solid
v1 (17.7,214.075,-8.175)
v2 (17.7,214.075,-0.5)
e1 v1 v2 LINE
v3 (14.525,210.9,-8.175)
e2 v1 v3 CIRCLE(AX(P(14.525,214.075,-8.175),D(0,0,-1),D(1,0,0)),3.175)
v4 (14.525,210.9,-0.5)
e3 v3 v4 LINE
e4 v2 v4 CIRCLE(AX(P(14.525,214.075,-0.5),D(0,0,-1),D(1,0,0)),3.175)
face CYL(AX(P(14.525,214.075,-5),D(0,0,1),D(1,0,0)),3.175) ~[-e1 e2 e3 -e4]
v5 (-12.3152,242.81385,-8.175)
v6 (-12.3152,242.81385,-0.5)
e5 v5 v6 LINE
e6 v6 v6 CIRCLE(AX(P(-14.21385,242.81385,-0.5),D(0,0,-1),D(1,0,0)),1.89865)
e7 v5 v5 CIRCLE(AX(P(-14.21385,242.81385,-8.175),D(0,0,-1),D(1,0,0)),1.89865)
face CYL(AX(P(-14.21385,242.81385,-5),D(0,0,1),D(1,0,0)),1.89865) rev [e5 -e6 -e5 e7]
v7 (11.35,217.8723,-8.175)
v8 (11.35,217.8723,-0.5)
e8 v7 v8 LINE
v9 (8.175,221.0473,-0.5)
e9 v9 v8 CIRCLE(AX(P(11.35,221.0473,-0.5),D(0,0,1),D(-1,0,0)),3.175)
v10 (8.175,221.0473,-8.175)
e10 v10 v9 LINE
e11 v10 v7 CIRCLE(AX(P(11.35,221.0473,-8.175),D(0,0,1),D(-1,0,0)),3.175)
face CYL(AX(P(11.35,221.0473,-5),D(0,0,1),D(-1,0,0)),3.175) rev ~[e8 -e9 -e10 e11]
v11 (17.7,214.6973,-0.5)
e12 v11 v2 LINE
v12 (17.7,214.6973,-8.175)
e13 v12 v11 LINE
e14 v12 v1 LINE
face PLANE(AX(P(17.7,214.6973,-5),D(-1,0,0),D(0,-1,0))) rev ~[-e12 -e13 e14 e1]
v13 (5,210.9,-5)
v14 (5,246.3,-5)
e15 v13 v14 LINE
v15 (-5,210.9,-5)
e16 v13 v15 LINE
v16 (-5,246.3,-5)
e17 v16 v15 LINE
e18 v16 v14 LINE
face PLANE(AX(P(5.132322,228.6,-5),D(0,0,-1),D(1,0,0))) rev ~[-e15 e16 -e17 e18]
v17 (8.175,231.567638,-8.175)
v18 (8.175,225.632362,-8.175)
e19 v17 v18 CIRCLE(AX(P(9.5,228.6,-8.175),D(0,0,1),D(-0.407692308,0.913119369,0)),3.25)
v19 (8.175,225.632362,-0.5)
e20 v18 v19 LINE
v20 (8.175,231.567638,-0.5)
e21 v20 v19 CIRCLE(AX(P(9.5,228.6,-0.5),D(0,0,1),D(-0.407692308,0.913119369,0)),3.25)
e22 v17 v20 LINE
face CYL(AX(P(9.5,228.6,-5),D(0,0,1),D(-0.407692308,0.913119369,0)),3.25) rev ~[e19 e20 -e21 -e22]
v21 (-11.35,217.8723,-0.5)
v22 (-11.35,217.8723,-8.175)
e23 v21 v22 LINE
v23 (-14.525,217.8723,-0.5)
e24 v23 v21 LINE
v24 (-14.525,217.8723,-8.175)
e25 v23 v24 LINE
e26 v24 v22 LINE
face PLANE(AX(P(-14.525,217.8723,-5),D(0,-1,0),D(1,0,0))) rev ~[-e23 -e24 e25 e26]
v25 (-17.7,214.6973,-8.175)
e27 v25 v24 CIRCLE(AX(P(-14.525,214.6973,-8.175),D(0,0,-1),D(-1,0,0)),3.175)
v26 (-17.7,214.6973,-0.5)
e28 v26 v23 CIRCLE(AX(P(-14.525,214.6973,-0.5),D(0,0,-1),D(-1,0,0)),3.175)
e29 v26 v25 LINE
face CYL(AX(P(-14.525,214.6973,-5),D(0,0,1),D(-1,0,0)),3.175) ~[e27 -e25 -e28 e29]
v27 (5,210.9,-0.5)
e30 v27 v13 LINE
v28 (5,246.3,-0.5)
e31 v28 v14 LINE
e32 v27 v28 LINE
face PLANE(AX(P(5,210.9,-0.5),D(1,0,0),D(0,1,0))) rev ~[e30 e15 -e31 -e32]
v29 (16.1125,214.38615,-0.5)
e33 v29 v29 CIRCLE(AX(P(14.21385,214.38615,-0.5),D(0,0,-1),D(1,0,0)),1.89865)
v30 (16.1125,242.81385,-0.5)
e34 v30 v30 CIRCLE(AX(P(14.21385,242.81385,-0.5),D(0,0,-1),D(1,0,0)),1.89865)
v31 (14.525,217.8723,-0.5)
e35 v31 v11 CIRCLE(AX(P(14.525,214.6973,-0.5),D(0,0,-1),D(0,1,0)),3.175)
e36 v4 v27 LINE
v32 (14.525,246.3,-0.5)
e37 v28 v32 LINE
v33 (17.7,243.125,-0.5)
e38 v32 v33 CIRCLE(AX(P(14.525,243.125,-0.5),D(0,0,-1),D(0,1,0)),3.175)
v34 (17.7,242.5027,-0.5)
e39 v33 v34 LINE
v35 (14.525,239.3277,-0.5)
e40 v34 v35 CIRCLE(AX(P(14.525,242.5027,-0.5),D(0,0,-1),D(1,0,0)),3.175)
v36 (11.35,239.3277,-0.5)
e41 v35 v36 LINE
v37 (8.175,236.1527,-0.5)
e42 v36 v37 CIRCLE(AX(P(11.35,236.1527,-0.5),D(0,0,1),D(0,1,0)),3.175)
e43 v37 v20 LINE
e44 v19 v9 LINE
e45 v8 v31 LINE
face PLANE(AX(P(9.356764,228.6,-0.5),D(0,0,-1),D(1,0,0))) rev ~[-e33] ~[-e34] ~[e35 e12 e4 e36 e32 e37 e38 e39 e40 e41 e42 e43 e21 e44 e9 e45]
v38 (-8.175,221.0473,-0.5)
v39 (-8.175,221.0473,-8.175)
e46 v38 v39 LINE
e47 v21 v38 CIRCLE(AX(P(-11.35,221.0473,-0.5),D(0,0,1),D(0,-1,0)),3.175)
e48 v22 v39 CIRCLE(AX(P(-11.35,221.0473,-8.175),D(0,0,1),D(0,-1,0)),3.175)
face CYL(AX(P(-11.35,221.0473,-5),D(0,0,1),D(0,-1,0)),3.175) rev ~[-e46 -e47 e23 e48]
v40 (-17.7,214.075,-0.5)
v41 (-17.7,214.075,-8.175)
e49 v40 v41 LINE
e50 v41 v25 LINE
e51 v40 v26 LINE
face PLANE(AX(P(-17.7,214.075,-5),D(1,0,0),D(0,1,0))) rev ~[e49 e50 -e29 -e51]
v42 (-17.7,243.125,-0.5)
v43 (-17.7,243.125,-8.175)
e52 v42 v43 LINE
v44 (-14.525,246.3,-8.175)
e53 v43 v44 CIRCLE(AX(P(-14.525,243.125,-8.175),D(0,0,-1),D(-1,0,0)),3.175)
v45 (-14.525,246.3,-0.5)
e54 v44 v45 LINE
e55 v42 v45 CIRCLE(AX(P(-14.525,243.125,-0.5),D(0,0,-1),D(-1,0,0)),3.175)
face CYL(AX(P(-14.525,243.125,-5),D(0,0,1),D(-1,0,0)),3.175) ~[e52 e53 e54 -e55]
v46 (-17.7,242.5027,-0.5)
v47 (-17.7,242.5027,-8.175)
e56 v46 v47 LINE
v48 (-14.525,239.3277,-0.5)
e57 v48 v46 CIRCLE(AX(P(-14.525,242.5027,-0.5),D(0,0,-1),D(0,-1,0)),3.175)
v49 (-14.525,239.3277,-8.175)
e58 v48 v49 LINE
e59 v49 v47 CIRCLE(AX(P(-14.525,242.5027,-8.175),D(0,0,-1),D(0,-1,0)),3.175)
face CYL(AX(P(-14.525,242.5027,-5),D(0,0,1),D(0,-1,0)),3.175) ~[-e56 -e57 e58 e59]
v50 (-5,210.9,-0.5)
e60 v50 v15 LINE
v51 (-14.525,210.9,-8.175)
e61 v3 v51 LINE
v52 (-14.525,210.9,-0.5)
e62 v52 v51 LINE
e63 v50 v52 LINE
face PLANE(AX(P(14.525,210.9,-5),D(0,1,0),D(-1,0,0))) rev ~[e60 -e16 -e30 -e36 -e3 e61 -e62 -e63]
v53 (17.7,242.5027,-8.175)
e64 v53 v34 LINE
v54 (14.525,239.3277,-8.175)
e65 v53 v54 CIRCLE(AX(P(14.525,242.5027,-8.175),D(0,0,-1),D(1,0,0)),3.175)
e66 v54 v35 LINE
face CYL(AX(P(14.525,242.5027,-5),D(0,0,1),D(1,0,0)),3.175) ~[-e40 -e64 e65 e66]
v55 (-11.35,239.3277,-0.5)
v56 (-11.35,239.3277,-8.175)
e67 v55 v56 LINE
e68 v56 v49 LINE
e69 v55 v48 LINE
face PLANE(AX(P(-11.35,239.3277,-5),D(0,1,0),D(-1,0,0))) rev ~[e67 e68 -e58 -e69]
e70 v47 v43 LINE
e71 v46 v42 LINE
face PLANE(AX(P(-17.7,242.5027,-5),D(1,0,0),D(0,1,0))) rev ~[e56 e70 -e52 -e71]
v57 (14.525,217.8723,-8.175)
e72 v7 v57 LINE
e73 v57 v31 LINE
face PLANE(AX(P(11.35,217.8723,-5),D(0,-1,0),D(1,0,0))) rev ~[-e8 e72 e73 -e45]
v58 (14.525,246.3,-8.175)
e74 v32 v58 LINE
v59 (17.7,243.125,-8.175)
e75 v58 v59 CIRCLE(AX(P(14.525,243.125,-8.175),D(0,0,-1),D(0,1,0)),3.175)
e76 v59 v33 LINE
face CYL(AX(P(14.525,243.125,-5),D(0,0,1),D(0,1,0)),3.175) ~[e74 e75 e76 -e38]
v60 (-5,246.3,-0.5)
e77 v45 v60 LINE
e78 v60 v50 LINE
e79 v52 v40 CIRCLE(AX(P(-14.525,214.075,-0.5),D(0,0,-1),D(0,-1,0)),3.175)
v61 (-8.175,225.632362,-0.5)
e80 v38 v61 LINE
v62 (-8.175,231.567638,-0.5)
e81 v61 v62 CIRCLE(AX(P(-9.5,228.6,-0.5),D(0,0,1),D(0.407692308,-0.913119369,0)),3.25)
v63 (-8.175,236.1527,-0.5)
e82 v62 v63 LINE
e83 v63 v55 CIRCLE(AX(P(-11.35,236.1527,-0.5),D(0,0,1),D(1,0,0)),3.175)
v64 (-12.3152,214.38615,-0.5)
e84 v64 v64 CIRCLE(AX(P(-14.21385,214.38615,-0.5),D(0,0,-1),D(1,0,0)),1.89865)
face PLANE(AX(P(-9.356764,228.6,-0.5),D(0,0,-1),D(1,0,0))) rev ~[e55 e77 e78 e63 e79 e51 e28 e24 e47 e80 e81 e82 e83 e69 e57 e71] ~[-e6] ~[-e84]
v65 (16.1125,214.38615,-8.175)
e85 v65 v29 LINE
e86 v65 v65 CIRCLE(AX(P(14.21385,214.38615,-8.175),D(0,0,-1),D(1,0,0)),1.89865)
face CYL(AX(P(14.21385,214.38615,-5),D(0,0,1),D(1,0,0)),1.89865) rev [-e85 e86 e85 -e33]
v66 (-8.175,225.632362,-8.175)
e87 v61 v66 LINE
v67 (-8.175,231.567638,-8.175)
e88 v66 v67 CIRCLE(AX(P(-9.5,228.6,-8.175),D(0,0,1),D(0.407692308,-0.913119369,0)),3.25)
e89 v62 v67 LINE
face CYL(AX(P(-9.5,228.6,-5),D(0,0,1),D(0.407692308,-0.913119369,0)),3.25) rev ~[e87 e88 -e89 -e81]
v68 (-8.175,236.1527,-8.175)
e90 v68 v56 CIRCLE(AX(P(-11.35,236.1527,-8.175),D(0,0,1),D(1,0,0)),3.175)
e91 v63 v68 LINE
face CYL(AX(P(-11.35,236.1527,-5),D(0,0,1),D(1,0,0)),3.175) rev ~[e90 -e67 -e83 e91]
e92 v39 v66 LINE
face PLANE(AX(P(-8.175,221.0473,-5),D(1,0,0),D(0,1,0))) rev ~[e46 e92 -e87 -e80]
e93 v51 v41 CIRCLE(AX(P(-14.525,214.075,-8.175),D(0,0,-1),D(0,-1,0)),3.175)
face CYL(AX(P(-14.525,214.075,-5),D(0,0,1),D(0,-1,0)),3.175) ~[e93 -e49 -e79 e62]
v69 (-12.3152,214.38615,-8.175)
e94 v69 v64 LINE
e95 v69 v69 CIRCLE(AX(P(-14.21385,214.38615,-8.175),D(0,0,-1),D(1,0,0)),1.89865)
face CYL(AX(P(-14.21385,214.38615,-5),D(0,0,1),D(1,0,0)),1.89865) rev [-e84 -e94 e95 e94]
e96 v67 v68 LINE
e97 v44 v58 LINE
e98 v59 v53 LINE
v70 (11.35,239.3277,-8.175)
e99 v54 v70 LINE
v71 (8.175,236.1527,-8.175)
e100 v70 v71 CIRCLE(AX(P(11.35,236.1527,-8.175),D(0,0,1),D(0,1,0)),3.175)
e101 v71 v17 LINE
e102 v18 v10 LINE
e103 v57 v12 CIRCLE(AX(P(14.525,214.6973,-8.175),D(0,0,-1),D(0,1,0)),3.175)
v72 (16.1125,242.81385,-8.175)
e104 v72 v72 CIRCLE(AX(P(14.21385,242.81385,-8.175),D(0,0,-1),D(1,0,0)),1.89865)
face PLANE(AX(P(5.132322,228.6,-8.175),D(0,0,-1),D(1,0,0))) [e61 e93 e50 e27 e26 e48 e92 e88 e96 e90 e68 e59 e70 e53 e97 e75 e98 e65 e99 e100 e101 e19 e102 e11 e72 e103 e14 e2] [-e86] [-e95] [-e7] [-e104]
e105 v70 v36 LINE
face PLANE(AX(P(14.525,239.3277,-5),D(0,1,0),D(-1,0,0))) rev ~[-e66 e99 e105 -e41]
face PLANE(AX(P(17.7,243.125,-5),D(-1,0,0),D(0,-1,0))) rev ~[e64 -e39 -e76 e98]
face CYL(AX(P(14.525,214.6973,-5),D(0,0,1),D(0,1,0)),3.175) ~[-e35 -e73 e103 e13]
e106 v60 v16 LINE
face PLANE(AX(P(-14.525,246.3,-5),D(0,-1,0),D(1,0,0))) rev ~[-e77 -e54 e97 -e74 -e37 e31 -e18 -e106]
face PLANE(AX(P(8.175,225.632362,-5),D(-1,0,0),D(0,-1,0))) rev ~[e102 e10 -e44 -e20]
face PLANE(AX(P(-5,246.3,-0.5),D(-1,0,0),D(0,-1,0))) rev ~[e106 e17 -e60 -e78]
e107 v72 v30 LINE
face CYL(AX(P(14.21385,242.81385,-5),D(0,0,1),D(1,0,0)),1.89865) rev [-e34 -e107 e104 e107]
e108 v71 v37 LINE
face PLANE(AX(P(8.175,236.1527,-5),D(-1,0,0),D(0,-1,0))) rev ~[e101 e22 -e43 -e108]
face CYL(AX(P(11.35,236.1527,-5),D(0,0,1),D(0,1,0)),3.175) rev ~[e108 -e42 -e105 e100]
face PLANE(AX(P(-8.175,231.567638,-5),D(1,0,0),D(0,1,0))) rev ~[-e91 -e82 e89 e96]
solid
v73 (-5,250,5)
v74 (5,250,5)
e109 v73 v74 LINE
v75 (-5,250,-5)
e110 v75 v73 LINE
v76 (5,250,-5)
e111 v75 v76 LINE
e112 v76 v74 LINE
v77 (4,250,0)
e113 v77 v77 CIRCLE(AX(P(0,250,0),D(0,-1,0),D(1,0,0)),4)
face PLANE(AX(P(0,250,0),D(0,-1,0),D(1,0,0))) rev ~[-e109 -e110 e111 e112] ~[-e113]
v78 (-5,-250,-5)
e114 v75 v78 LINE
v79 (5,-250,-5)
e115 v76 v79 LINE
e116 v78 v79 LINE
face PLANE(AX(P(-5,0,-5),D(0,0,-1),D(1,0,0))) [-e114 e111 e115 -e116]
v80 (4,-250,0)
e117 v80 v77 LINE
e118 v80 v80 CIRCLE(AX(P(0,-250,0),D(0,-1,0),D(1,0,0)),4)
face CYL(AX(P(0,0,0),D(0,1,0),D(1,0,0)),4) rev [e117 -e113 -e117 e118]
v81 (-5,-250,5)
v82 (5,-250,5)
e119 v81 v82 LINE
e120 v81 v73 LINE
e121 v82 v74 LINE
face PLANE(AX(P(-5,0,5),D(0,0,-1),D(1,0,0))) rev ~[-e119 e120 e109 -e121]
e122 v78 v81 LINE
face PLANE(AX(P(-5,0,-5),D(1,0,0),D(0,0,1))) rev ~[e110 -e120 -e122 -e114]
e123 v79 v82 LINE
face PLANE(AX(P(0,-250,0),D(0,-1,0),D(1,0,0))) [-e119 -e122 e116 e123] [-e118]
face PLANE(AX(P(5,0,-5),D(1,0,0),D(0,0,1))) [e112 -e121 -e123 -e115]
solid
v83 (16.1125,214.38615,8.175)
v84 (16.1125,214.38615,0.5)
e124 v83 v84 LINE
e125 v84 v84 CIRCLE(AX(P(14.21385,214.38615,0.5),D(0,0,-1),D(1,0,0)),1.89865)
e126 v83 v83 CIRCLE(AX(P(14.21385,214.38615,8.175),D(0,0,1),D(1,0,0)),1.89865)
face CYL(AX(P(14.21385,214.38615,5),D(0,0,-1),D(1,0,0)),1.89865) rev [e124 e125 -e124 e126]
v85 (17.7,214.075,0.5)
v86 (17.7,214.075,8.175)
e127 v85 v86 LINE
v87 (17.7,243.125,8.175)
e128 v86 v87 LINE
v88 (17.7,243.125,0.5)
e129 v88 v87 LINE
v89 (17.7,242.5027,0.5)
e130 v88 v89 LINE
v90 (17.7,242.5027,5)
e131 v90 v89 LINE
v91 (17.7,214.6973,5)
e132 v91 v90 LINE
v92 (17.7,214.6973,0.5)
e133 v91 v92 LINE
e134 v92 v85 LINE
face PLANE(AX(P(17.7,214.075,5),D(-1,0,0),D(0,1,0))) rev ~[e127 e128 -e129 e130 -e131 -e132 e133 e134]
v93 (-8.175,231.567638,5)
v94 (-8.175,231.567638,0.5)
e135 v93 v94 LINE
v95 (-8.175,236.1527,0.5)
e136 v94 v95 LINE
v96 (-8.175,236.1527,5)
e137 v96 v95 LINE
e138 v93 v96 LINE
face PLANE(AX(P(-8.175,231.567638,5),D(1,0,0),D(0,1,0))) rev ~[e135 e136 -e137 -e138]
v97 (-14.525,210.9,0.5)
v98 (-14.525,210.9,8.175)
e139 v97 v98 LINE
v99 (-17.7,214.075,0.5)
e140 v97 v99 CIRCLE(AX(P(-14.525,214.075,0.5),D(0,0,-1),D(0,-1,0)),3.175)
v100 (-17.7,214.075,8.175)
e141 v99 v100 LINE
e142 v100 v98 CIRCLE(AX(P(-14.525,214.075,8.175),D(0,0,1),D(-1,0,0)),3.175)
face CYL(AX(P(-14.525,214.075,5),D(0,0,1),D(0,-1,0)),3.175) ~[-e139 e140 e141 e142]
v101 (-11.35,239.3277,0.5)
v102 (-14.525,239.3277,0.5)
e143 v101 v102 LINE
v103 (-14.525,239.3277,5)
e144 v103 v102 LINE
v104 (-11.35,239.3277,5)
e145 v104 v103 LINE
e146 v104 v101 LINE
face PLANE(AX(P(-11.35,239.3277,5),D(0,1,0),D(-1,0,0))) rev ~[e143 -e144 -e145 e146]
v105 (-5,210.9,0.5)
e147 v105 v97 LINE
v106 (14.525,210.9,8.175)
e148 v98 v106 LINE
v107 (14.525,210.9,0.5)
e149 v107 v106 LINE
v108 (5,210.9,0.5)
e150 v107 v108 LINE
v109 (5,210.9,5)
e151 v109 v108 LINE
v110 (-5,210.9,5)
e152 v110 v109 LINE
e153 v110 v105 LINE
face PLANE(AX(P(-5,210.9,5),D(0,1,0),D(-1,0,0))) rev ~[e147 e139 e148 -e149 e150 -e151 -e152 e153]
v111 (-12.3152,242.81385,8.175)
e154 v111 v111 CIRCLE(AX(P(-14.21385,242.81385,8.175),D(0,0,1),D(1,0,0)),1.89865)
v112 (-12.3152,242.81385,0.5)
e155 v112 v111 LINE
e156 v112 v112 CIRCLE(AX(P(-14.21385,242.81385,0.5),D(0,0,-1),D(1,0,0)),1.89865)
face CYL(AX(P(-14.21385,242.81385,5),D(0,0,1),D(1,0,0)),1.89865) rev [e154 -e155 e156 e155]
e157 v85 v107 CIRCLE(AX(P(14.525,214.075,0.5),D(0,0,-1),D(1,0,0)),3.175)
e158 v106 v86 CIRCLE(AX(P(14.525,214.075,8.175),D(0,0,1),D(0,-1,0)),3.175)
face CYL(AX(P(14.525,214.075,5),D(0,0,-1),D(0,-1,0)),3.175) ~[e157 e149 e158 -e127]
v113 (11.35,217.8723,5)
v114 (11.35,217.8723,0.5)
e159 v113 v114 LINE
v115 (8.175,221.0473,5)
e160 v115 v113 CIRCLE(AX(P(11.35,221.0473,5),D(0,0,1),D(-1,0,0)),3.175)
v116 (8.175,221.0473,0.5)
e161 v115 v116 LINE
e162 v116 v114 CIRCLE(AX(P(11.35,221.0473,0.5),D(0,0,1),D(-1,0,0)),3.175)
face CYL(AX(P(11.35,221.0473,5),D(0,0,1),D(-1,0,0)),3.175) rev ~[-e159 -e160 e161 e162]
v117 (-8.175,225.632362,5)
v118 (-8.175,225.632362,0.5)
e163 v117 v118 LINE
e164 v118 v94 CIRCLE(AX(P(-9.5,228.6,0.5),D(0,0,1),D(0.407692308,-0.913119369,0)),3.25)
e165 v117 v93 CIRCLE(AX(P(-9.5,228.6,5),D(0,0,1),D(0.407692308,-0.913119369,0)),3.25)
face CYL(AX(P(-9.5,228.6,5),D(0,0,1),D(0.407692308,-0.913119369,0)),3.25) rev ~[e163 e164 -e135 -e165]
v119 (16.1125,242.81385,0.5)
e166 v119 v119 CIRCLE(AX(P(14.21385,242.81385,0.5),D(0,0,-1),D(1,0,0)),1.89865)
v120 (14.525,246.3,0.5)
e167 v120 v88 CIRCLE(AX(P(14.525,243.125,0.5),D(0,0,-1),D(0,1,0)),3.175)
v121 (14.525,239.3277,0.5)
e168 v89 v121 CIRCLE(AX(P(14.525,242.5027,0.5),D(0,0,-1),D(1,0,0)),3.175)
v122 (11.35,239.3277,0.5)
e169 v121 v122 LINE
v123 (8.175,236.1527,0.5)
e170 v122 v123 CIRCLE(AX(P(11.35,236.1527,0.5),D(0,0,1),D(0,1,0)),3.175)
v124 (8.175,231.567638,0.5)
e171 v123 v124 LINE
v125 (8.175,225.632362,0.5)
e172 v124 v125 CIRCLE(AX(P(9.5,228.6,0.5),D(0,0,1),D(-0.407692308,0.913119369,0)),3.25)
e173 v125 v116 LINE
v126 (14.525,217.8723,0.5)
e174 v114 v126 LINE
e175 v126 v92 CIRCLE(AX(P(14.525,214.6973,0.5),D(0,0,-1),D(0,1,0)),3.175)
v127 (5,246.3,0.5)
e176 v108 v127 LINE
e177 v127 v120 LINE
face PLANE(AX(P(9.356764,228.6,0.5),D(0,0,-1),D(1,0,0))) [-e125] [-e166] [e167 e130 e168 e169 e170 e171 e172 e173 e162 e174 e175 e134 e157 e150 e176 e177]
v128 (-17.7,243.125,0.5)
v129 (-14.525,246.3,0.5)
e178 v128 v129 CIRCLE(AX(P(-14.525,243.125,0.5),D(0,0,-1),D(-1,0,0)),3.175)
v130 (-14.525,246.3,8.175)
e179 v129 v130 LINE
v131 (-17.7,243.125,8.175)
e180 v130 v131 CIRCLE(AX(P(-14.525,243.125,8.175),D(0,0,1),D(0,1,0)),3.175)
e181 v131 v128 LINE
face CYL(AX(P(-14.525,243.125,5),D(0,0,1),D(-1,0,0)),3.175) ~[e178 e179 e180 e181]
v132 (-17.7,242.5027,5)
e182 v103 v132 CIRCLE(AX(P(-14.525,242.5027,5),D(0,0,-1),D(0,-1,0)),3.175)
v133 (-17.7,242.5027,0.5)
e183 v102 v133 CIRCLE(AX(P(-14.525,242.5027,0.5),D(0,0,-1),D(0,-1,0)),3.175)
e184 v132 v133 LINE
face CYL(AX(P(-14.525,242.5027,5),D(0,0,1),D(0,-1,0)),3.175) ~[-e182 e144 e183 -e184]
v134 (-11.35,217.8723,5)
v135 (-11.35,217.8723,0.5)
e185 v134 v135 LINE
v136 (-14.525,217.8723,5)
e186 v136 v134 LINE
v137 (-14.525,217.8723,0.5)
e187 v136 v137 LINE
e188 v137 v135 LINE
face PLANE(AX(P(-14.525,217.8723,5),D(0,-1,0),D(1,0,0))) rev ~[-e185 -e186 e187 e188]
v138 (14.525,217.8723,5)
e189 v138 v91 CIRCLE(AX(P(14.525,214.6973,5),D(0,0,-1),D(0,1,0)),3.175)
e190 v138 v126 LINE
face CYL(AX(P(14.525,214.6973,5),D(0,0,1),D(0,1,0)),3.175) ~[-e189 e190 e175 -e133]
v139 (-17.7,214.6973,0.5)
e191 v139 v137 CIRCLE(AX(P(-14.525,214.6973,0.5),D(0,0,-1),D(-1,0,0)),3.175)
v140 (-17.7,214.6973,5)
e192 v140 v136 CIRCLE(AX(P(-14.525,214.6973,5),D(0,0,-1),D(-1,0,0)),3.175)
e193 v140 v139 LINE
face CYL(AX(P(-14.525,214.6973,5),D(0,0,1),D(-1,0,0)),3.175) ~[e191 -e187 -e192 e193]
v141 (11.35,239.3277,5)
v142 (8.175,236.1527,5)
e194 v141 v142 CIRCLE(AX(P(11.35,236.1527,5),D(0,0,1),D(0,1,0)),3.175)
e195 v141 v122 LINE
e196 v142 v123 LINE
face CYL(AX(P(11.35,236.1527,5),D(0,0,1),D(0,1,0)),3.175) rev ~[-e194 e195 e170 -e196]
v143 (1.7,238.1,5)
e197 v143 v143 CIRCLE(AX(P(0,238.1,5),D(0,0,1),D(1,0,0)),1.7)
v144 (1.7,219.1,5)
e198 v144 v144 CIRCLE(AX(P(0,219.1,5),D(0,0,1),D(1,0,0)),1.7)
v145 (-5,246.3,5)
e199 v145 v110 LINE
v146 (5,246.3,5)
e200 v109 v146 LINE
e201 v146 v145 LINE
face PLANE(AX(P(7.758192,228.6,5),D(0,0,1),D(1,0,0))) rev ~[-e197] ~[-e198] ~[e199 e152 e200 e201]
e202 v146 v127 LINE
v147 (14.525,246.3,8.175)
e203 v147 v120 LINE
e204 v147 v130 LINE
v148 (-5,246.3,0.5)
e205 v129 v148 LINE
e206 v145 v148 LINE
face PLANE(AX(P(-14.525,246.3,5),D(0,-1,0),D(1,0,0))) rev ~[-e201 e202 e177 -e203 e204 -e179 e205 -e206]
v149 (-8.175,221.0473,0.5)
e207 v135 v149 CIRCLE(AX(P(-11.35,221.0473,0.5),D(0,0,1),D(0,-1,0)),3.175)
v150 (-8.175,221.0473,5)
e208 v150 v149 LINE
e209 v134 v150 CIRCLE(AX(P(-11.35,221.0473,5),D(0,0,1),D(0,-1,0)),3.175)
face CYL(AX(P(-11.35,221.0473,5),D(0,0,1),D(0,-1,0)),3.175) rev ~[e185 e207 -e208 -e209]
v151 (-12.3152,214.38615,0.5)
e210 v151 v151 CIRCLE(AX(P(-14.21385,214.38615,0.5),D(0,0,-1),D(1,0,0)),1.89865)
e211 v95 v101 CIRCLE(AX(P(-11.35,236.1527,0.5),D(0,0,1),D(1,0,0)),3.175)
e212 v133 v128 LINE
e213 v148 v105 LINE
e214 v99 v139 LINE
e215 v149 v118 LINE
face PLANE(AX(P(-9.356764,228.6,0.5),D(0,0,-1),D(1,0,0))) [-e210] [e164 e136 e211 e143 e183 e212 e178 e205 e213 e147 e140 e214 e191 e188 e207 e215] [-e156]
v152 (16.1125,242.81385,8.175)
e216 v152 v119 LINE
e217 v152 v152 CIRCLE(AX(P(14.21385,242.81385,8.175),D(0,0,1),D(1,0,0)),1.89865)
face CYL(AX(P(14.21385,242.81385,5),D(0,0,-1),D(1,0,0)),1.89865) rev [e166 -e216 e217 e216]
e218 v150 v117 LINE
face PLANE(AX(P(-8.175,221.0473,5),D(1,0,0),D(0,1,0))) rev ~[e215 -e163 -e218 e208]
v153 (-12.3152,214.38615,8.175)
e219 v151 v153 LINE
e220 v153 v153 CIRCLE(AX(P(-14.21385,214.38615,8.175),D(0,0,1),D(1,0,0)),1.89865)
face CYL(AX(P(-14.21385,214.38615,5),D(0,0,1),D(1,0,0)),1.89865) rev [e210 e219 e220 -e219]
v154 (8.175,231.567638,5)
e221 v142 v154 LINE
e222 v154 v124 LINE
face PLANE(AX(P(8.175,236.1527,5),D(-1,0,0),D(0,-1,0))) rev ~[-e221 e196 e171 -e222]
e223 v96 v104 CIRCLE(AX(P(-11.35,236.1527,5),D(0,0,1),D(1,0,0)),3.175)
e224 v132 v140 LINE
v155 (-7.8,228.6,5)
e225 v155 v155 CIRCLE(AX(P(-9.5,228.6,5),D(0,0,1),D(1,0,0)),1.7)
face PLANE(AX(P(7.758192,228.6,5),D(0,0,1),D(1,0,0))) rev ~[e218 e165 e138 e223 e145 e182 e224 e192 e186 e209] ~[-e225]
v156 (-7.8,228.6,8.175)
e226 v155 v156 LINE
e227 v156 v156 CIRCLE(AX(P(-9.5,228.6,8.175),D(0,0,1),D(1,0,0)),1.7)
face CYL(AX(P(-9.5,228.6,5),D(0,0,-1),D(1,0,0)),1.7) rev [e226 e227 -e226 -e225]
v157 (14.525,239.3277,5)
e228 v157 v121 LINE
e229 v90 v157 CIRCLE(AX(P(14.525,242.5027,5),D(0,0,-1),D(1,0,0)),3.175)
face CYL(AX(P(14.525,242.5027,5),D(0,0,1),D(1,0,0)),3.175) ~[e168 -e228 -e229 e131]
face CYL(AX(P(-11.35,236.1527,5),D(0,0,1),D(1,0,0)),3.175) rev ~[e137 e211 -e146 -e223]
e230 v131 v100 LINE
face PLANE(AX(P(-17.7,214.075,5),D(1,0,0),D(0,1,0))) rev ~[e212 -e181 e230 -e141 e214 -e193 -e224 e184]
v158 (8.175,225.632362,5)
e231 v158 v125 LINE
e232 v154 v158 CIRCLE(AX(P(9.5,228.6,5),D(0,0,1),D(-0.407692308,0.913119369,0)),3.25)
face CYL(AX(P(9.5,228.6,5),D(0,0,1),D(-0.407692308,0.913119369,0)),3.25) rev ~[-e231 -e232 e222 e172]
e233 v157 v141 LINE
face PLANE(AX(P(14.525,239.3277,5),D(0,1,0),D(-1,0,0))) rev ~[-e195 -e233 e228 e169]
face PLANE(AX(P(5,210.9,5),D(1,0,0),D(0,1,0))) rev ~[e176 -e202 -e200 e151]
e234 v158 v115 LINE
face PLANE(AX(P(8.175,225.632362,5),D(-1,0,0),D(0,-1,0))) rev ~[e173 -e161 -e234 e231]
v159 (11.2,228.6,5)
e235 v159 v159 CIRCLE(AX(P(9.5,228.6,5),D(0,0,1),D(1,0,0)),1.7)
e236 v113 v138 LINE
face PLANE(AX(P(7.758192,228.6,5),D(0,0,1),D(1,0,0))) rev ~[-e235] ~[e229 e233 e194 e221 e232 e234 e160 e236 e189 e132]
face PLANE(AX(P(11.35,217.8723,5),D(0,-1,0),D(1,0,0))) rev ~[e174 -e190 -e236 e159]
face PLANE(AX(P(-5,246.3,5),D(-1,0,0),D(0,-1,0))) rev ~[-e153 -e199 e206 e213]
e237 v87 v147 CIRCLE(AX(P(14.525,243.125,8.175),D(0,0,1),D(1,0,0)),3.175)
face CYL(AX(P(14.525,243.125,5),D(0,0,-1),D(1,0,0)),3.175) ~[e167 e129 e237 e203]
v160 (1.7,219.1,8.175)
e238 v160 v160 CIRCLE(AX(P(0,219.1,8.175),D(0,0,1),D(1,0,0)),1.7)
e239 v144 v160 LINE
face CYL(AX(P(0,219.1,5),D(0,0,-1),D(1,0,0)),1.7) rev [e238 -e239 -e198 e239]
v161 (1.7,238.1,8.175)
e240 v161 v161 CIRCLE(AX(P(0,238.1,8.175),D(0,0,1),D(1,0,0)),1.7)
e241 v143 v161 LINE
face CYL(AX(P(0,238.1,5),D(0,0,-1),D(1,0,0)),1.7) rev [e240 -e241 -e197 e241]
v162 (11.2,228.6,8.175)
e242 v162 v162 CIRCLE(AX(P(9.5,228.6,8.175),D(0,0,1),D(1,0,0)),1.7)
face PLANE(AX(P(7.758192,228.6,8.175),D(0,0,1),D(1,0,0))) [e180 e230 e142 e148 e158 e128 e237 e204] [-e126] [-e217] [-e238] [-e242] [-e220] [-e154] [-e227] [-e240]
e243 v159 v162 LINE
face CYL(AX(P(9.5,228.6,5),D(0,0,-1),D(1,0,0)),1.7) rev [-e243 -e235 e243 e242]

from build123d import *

# Parameters (mm, degrees)
F0_W      = 10
F0_H      = 10
F0_R      = 4
F1_DEPTH  = 250
F2_R      = 1.7
F2_R_2    = 1.89865
F3_DEPTH  = 3.175
F4_R      = 1.89865
F5_DEPTH  = 4.5
F7_R      = 1.89865
F8_DEPTH  = 4.5
F9_R      = 1.89865
F10_DEPTH = 3.175


with BuildPart() as f1:
    # F0 (on Front) → F1 (new body, symmetric)
    with BuildSketch(Plane.XZ):
        Rectangle(F0_W, F0_H)
        Circle(F0_R, mode=Mode.SUBTRACT)
    extrude(amount=F1_DEPTH, both=True)


with BuildPart() as f3:
    # F2 (on face) → F3 (new body)
    with BuildSketch(Plane.XY.offset(5)):
        with BuildLine():
            ThreePointArc((5, 216.060063796), (11.1747483193, 221.0253712962), (13.5, 228.6))
            ThreePointArc((13.5, 228.6), (11.1747483193, 236.1746287038), (5, 241.139936204))
            Line((5, 241.139936204), (5, 216.060063796))
        make_face()
        with Locations((9.5, 228.6)):
            Circle(F2_R, mode=Mode.SUBTRACT)
        with BuildLine():
            ThreePointArc((5, 241.139936204), (11.1747483193, 236.1746287038), (13.5, 228.6))
            ThreePointArc((13.5, 228.6), (11.1747483193, 221.0253712962), (5, 216.060063796))
            Line((5, 216.060063796), (5, 212.6922778186))
            ThreePointArc((5, 212.6922778186), (13.4430395558, 218.7338805754), (16.675, 228.6))
            ThreePointArc((16.675, 228.6), (13.4430395558, 238.4661194246), (5, 244.5077221814))
            Line((5, 244.5077221814), (5, 241.139936204))
        make_face()
        with BuildLine():
            Line((5, 216.060063796), (5, 241.139936204))
            ThreePointArc((5, 241.139936204), (0, 242.1), (-5, 241.139936204))
            Line((-5, 241.139936204), (-5, 216.060063796))
            ThreePointArc((-5, 216.060063796), (0, 215.1), (5, 216.060063796))
        make_face()
        with Locations((0, 219.1)):
            Circle(F2_R, mode=Mode.SUBTRACT)
        with Locations((0, 238.1)):
            Circle(F2_R, mode=Mode.SUBTRACT)
        with BuildLine():
            ThreePointArc((-5, 241.139936204), (0, 242.1), (5, 241.139936204))
            Line((5, 241.139936204), (5, 244.5077221814))
            ThreePointArc((5, 244.5077221814), (0, 245.275), (-5, 244.5077221814))
            Line((-5, 244.5077221814), (-5, 241.139936204))
        make_face()
        with BuildLine():
            Line((5, 212.6922778186), (5, 216.060063796))
            ThreePointArc((5, 216.060063796), (0, 215.1), (-5, 216.060063796))
            Line((-5, 216.060063796), (-5, 212.6922778186))
            ThreePointArc((-5, 212.6922778186), (0, 211.925), (5, 212.6922778186))
        make_face()
        with BuildLine():
            Line((-5, 216.060063796), (-5, 241.139936204))
            ThreePointArc((-5, 241.139936204), (-13.5, 228.6), (-5, 216.060063796))
        make_face()
        with Locations((-9.5, 228.6)):
            Circle(F2_R, mode=Mode.SUBTRACT)
        with BuildLine():
            ThreePointArc((-5, 216.060063796), (-13.5, 228.6), (-5, 241.139936204))
            Line((-5, 241.139936204), (-5, 244.5077221814))
            ThreePointArc((-5, 244.5077221814), (-16.675, 228.6), (-5, 212.6922778186))
            Line((-5, 212.6922778186), (-5, 216.060063796))
        make_face()
        with BuildLine():
            Line((5, 246.3), (5, 244.5077221814))
            ThreePointArc((5, 244.5077221814), (13.4430395558, 238.4661194246), (16.675, 228.6))
            ThreePointArc((16.675, 228.6), (13.4430395558, 218.7338805754), (5, 212.6922778186))
            Line((5, 212.6922778186), (5, 210.9))
            Line((5, 210.9), (14.525, 210.9))
            ThreePointArc((14.525, 210.9), (16.7700640303, 211.8299359697), (17.7, 214.075))
            Line((17.7, 214.075), (17.7, 243.125))
            ThreePointArc((17.7, 243.125), (16.7700640303, 245.3700640303), (14.525, 246.3))
            Line((14.525, 246.3), (5, 246.3))
        make_face()
        with Locations((14.21385, 214.38615)):
            Circle(F2_R_2, mode=Mode.SUBTRACT)
        with Locations((14.21385, 242.81385)):
            Circle(F2_R_2, mode=Mode.SUBTRACT)
        with BuildLine():
            ThreePointArc((-5, 244.5077221814), (0, 245.275), (5, 244.5077221814))
            Line((5, 244.5077221814), (5, 246.3))
            Line((5, 246.3), (-5, 246.3))
            Line((-5, 246.3), (-5, 244.5077221814))
        make_face()
        with BuildLine():
            Line((5, 210.9), (5, 212.6922778186))
            ThreePointArc((5, 212.6922778186), (0, 211.925), (-5, 212.6922778186))
            Line((-5, 212.6922778186), (-5, 210.9))
            Line((-5, 210.9), (5, 210.9))
        make_face()
        with BuildLine():
            ThreePointArc((-5, 212.6922778186), (-16.675, 228.6), (-5, 244.5077221814))
            Line((-5, 244.5077221814), (-5, 246.3))
            Line((-5, 246.3), (-14.525, 246.3))
            ThreePointArc((-14.525, 246.3), (-16.7700640303, 245.3700640303), (-17.7, 243.125))
            Line((-17.7, 243.125), (-17.7, 214.075))
            ThreePointArc((-17.7, 214.075), (-16.7700640303, 211.8299359697), (-14.525, 210.9))
            Line((-14.525, 210.9), (-5, 210.9))
            Line((-5, 210.9), (-5, 212.6922778186))
        make_face()
        with Locations((-14.21385, 214.38615)):
            Circle(F2_R_2, mode=Mode.SUBTRACT)
        with Locations((-14.21385, 242.81385)):
            Circle(F2_R_2, mode=Mode.SUBTRACT)
    extrude(amount=F3_DEPTH)

    # F4 (on face) → F5 (join)
    with BuildSketch(Plane(origin=(0, 0, 5), x_dir=(1, 0, 0), z_dir=(0, 0, -1))):
        with BuildLine():
            ThreePointArc((-17.7, -214.6973), (-16.7700640303, -216.9423640303), (-14.525, -217.8723))
            Line((-14.525, -217.8723), (-11.35, -217.8723))
            ThreePointArc((-11.35, -217.8723), (-9.1049359697, -218.8022359697), (-8.175, -221.0473))
            Line((-8.175, -221.0473), (-8.175, -225.6323620504))
            ThreePointArc((-8.175, -225.6323620504), (-6.25, -228.6), (-8.175, -231.5676379496))
            Line((-8.175, -231.5676379496), (-8.175, -236.1527))
            ThreePointArc((-8.175, -236.1527), (-9.1049359697, -238.3977640303), (-11.35, -239.3277))
            Line((-11.35, -239.3277), (-14.525, -239.3277))
            ThreePointArc((-14.525, -239.3277), (-16.7700640303, -240.2576359697), (-17.7, -242.5027))
            Line((-17.7, -242.5027), (-17.7, -243.125))
            ThreePointArc((-17.7, -243.125), (-16.7700640303, -245.3700640303), (-14.525, -246.3))
            Line((-14.525, -246.3), (-5, -246.3))
            Line((-5, -246.3), (-5, -210.9))
            Line((-5, -210.9), (-14.525, -210.9))
            ThreePointArc((-14.525, -210.9), (-16.7700640303, -211.8299359697), (-17.7, -214.075))
            Line((-17.7, -214.075), (-17.7, -214.6973))
        make_face()
        with Locations((-14.21385, -242.81385)):
            Circle(F4_R, mode=Mode.SUBTRACT)
        with Locations((-14.21385, -214.38615)):
            Circle(F4_R, mode=Mode.SUBTRACT)
        with BuildLine():
            Line((14.525, -210.9), (5, -210.9))
            Line((5, -210.9), (5, -246.3))
            Line((5, -246.3), (14.525, -246.3))
            ThreePointArc((14.525, -246.3), (16.7700640303, -245.3700640303), (17.7, -243.125))
            Line((17.7, -243.125), (17.7, -242.5027))
            ThreePointArc((17.7, -242.5027), (16.7700640303, -240.2576359697), (14.525, -239.3277))
            Line((14.525, -239.3277), (11.35, -239.3277))
            ThreePointArc((11.35, -239.3277), (9.1049359697, -238.3977640303), (8.175, -236.1527))
            Line((8.175, -236.1527), (8.175, -231.5676379496))
            ThreePointArc((8.175, -231.5676379496), (6.25, -228.6), (8.175, -225.6323620504))
            Line((8.175, -225.6323620504), (8.175, -221.0473))
            ThreePointArc((8.175, -221.0473), (9.1049359697, -218.8022359697), (11.35, -217.8723))
            Line((11.35, -217.8723), (14.525, -217.8723))
            ThreePointArc((14.525, -217.8723), (16.7700640303, -216.9423640303), (17.7, -214.6973))
            Line((17.7, -214.6973), (17.7, -214.075))
            ThreePointArc((17.7, -214.075), (16.7700640303, -211.8299359697), (14.525, -210.9))
        make_face()
        with Locations((14.21385, -242.81385)):
            Circle(F4_R, mode=Mode.SUBTRACT)
        with Locations((14.21385, -214.38615)):
            Circle(F4_R, mode=Mode.SUBTRACT)
    extrude(amount=F5_DEPTH)


with BuildPart() as f8:
    # F7 (on offset) → F8 (new body)
    with BuildSketch(Plane(origin=(0, 0, -0.5), x_dir=(1, 0, 0), z_dir=(0, 0, -1))):
        with BuildLine():
            Line((-5, -210.9), (-14.525, -210.9))
            ThreePointArc((-14.525, -210.9), (-16.7700640303, -211.8299359697), (-17.7, -214.075))
            Line((-17.7, -214.075), (-17.7, -214.6973))
            ThreePointArc((-17.7, -214.6973), (-16.7700640303, -216.9423640303), (-14.525, -217.8723))
            Line((-14.525, -217.8723), (-11.35, -217.8723))
            ThreePointArc((-11.35, -217.8723), (-9.1049359697, -218.8022359697), (-8.175, -221.0473))
            Line((-8.175, -221.0473), (-8.175, -225.6323620504))
            ThreePointArc((-8.175, -225.6323620504), (-6.25, -228.6), (-8.175, -231.5676379496))
            Line((-8.175, -231.5676379496), (-8.175, -236.1527))
            ThreePointArc((-8.175, -236.1527), (-9.1049359697, -238.3977640303), (-11.35, -239.3277))
            Line((-11.35, -239.3277), (-14.525, -239.3277))
            ThreePointArc((-14.525, -239.3277), (-16.7700640303, -240.2576359697), (-17.7, -242.5027))
            Line((-17.7, -242.5027), (-17.7, -243.125))
            ThreePointArc((-17.7, -243.125), (-16.7700640303, -245.3700640303), (-14.525, -246.3))
            Line((-14.525, -246.3), (-5, -246.3))
            Line((-5, -246.3), (-5, -210.9))
        make_face()
        with Locations((-14.21385, -242.81385)):
            Circle(F7_R, mode=Mode.SUBTRACT)
        with Locations((-14.21385, -214.38615)):
            Circle(F7_R, mode=Mode.SUBTRACT)
    extrude(amount=F8_DEPTH)



with BuildPart() as f8b:
    # F7 (on offset) → F8, piece 2 (new body)
    with BuildSketch(Plane(origin=(0, 0, -0.5), x_dir=(1, 0, 0), z_dir=(0, 0, -1))):
        with BuildLine():
            Line((5, -210.9), (5, -246.3))
            Line((5, -246.3), (14.525, -246.3))
            ThreePointArc((14.525, -246.3), (16.7700640303, -245.3700640303), (17.7, -243.125))
            Line((17.7, -243.125), (17.7, -242.5027))
            ThreePointArc((17.7, -242.5027), (16.7700640303, -240.2576359697), (14.525, -239.3277))
            Line((14.525, -239.3277), (11.35, -239.3277))
            ThreePointArc((11.35, -239.3277), (9.1049359697, -238.3977640303), (8.175, -236.1527))
            Line((8.175, -236.1527), (8.175, -231.5676379496))
            ThreePointArc((8.175, -231.5676379496), (6.25, -228.6), (8.175, -225.6323620504))
            Line((8.175, -225.6323620504), (8.175, -221.0473))
            ThreePointArc((8.175, -221.0473), (9.1049359697, -218.8022359697), (11.35, -217.8723))
            Line((11.35, -217.8723), (14.525, -217.8723))
            ThreePointArc((14.525, -217.8723), (16.7700640303, -216.9423640303), (17.7, -214.6973))
            Line((17.7, -214.6973), (17.7, -214.075))
            ThreePointArc((17.7, -214.075), (16.7700640303, -211.8299359697), (14.525, -210.9))
            Line((14.525, -210.9), (5, -210.9))
        make_face()
        with Locations((14.21385, -242.81385)):
            Circle(F7_R, mode=Mode.SUBTRACT)
        with Locations((14.21385, -214.38615)):
            Circle(F7_R, mode=Mode.SUBTRACT)
    extrude(amount=F8_DEPTH)


with BuildPart() as f8_1:
    add(f8.part)

    add(f8b.part)  # F10 merges F8b
    # F9 (on face) → F10 (join)
    with BuildSketch(Plane(origin=(0, 0, -5), x_dir=(1, 0, 0), z_dir=(0, 0, -1))):
        with BuildLine():
            Line((-5, -210.9), (-5, -246.3))
            Line((-5, -246.3), (5, -246.3))
            Line((5, -246.3), (14.525, -246.3))
            ThreePointArc((14.525, -246.3), (16.7700640303, -245.3700640303), (17.7, -243.125))
            Line((17.7, -243.125), (17.7, -242.5027))
            ThreePointArc((17.7, -242.5027), (16.7700640303, -240.2576359697), (14.525, -239.3277))
            Line((14.525, -239.3277), (11.35, -239.3277))
            ThreePointArc((11.35, -239.3277), (9.1049359697, -238.3977640303), (8.175, -236.1527))
            Line((8.175, -236.1527), (8.175, -231.5676379496))
            ThreePointArc((8.175, -231.5676379496), (6.25, -228.6), (8.175, -225.6323620504))
            Line((8.175, -225.6323620504), (8.175, -221.0473))
            ThreePointArc((8.175, -221.0473), (9.1049359697, -218.8022359697), (11.35, -217.8723))
            Line((11.35, -217.8723), (14.525, -217.8723))
            ThreePointArc((14.525, -217.8723), (16.7700640303, -216.9423640303), (17.7, -214.6973))
            Line((17.7, -214.6973), (17.7, -214.075))
            ThreePointArc((17.7, -214.075), (16.7700640303, -211.8299359697), (14.525, -210.9))
            Line((14.525, -210.9), (5, -210.9))
            Line((5, -210.9), (-5, -210.9))
        make_face()
        with Locations((14.21385, -242.81385)):
            Circle(F9_R, mode=Mode.SUBTRACT)
        with Locations((14.21385, -214.38615)):
            Circle(F9_R, mode=Mode.SUBTRACT)
        with BuildLine():
            Line((-14.525, -246.3), (-5, -246.3))
            Line((-5, -246.3), (-5, -210.9))
            Line((-5, -210.9), (-14.525, -210.9))
            ThreePointArc((-14.525, -210.9), (-16.7700640303, -211.8299359697), (-17.7, -214.075))
            Line((-17.7, -214.075), (-17.7, -214.6973))
            ThreePointArc((-17.7, -214.6973), (-16.7700640303, -216.9423640303), (-14.525, -217.8723))
            Line((-14.525, -217.8723), (-11.35, -217.8723))
            ThreePointArc((-11.35, -217.8723), (-9.1049359697, -218.8022359697), (-8.175, -221.0473))
            Line((-8.175, -221.0473), (-8.175, -225.6323620504))
            ThreePointArc((-8.175, -225.6323620504), (-6.25, -228.6), (-8.175, -231.5676379496))
            Line((-8.175, -231.5676379496), (-8.175, -236.1527))
            ThreePointArc((-8.175, -236.1527), (-9.1049359697, -238.3977640303), (-11.35, -239.3277))
            Line((-11.35, -239.3277), (-14.525, -239.3277))
            ThreePointArc((-14.525, -239.3277), (-16.7700640303, -240.2576359697), (-17.7, -242.5027))
            Line((-17.7, -242.5027), (-17.7, -243.125))
            ThreePointArc((-17.7, -243.125), (-16.7700640303, -245.3700640303), (-14.525, -246.3))
        make_face()
        with Locations((-14.21385, -242.81385)):
            Circle(F9_R, mode=Mode.SUBTRACT)
        with Locations((-14.21385, -214.38615)):
            Circle(F9_R, mode=Mode.SUBTRACT)
    extrude(amount=F10_DEPTH)


solid = Compound([f1.part, f3.part, f8_1.part])
